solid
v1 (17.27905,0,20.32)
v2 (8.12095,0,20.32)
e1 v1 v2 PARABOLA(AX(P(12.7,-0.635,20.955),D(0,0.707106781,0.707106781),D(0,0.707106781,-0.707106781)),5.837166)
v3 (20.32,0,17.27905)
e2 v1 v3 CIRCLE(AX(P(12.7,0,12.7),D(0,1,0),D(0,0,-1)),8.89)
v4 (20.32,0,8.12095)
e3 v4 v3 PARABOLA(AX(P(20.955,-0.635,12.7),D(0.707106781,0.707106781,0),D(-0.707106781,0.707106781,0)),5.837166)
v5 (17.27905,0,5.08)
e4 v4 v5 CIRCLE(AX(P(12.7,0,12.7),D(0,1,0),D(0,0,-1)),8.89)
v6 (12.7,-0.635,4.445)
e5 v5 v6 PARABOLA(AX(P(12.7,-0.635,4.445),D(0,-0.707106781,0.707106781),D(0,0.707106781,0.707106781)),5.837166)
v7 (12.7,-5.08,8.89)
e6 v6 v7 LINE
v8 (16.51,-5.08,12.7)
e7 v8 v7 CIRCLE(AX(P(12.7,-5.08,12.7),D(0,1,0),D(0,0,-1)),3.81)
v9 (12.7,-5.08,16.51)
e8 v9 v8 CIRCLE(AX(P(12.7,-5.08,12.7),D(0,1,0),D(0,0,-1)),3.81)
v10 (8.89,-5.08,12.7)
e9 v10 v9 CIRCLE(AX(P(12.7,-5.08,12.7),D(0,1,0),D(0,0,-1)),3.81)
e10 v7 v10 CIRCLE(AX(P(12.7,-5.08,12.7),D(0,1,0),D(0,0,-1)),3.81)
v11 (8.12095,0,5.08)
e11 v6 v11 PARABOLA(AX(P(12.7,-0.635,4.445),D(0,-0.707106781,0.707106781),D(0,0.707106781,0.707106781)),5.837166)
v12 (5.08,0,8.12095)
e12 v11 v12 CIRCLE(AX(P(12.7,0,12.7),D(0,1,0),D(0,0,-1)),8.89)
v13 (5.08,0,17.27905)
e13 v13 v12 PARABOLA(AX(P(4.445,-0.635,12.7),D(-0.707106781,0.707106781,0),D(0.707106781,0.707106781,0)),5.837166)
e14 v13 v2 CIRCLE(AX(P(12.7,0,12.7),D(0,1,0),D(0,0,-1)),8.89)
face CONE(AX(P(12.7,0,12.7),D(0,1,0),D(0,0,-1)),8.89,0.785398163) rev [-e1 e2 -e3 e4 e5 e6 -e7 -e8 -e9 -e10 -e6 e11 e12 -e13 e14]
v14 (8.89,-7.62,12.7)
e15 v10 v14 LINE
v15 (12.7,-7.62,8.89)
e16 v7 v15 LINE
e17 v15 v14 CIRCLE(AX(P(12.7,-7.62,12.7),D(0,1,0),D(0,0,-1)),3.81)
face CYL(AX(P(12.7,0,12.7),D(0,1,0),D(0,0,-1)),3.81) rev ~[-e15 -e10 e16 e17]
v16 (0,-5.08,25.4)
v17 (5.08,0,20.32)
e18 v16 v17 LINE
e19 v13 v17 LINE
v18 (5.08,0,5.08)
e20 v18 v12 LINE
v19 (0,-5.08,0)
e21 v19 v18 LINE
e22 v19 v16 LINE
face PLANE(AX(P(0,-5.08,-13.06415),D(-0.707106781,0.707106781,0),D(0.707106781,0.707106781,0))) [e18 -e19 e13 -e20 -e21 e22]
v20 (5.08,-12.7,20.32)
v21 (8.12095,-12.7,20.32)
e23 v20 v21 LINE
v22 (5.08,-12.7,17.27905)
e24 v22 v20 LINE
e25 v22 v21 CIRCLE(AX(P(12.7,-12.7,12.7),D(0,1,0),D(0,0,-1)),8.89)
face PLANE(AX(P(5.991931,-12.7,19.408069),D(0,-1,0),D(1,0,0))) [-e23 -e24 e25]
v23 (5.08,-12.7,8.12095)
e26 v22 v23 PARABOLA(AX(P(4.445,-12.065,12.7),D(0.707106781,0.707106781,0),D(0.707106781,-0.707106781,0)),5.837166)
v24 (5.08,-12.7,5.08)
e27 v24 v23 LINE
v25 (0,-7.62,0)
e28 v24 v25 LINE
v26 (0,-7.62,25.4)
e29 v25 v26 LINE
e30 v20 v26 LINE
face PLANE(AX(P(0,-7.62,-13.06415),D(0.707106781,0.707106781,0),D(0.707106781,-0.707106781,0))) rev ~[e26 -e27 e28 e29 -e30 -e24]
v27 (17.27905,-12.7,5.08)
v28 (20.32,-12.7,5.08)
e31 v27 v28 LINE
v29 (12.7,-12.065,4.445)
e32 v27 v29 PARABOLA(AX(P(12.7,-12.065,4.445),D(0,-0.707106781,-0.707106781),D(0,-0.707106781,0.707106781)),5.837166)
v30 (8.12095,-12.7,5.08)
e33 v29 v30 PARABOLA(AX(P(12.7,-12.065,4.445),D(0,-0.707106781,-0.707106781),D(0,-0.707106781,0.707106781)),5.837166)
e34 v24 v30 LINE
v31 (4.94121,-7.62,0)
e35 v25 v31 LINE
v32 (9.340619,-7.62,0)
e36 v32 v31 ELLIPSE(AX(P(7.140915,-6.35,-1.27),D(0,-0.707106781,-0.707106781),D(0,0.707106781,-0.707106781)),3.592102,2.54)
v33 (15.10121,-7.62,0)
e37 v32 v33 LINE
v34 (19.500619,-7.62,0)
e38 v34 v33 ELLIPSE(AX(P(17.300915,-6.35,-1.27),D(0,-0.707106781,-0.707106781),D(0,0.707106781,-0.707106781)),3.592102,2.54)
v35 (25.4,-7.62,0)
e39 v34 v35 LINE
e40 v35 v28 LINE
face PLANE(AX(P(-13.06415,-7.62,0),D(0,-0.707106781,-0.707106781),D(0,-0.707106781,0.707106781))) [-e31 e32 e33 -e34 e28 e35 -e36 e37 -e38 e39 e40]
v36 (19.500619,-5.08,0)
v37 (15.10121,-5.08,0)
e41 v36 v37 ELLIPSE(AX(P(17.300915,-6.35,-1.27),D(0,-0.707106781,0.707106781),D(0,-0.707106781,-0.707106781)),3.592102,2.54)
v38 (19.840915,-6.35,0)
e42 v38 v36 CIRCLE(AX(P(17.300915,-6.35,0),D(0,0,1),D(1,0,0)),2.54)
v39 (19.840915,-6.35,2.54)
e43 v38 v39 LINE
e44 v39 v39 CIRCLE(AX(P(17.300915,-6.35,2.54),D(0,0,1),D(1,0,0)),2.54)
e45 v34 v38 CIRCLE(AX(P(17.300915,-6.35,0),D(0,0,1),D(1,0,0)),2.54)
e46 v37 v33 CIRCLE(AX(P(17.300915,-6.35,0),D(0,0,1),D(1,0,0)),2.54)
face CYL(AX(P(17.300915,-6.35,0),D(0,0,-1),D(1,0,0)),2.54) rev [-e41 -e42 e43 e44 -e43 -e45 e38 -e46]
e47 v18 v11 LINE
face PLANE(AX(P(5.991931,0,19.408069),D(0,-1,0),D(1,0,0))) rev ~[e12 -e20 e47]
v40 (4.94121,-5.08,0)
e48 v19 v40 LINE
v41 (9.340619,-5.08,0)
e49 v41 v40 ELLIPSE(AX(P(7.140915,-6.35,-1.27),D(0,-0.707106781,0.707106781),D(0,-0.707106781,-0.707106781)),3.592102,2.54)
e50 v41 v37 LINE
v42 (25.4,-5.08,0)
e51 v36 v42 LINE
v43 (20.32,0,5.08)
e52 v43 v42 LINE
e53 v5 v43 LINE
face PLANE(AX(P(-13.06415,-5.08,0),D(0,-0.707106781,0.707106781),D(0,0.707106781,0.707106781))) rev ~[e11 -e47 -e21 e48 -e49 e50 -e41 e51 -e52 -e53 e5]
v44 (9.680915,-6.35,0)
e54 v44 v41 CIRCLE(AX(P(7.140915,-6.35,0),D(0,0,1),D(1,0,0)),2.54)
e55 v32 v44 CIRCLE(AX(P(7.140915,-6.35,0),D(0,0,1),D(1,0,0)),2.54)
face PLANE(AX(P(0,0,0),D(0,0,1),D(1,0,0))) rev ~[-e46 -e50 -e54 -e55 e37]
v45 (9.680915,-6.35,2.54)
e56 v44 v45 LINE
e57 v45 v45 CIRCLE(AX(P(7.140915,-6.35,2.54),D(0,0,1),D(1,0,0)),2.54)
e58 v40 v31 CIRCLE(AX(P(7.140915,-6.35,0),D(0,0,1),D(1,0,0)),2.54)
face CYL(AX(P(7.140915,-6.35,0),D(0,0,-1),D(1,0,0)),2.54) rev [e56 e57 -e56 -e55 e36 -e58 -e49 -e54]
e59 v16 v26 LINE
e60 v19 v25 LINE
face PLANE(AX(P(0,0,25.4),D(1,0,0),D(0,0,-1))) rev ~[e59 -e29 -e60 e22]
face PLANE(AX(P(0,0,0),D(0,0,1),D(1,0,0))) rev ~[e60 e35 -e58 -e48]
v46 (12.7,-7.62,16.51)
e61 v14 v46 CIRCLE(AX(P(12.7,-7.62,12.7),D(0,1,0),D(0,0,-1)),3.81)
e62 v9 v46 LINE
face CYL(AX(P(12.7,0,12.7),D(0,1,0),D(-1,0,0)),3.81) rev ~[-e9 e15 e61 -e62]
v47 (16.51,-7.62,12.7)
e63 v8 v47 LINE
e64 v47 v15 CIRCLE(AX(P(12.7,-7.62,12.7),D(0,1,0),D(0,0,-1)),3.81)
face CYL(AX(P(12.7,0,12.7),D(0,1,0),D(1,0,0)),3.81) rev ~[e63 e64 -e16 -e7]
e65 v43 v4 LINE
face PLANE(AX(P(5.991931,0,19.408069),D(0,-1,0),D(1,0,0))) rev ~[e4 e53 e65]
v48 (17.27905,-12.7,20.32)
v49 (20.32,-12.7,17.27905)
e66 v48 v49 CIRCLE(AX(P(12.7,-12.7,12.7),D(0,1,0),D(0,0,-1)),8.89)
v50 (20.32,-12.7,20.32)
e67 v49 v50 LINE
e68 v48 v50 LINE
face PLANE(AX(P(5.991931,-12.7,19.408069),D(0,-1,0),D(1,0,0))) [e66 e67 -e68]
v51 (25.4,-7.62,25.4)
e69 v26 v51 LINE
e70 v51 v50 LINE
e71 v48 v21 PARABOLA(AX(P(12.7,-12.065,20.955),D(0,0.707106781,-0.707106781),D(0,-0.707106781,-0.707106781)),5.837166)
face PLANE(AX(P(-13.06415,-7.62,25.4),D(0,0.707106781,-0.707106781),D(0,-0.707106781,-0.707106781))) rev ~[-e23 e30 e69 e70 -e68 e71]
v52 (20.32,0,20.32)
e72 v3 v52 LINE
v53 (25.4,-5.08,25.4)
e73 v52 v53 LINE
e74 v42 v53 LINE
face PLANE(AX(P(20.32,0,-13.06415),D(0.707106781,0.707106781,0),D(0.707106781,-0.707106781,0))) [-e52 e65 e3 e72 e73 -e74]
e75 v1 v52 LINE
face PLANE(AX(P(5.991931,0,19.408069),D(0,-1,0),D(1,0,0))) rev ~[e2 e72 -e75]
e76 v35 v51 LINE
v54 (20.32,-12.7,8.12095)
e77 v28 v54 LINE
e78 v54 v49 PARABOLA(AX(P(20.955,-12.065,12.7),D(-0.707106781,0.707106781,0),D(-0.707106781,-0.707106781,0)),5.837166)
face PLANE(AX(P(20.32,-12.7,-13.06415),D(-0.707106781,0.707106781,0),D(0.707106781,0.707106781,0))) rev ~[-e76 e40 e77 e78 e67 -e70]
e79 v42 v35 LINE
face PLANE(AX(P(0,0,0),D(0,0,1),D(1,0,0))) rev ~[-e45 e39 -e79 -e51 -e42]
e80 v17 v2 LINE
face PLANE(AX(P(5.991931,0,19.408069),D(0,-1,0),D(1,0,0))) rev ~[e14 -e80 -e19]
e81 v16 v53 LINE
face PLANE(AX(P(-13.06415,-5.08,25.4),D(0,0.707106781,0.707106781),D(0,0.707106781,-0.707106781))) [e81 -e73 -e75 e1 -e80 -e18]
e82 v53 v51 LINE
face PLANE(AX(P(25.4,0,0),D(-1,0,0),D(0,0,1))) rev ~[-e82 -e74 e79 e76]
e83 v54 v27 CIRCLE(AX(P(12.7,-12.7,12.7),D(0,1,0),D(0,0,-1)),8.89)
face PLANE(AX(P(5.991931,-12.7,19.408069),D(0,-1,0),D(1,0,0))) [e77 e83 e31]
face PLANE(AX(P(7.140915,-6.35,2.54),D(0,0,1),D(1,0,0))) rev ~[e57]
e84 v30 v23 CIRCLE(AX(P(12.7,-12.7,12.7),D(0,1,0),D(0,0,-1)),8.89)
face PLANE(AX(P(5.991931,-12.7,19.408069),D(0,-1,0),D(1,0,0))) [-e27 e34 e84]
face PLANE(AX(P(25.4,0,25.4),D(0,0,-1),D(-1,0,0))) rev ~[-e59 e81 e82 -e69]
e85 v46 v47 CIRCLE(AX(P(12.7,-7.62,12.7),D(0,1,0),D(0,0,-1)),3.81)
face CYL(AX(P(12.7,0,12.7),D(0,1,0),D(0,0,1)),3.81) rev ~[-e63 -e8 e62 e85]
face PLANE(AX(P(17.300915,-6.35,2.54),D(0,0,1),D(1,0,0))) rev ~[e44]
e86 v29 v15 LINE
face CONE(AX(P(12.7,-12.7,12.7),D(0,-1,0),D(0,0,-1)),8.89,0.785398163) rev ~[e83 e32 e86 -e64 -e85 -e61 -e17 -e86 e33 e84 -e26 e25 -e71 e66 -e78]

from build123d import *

# Parameters (mm, degrees)
F1_DEPTH    = 12.7
F2_R        = 2.54
F3_DEPTH    = 2.54
F4_T1_DEPTH = 51.5282991577
F4_T3_DEPTH = 51.5282991577


# Not quite as in the source:
# - a fillet or chamfer that OpenCascade refuses, or shapes differently, is made with other operations: its cross-section is extruded or revolved along the edge and cut away or added


with BuildPart() as f1:
    # F0 (on Front) → F1 (new body)
    with BuildSketch(Plane.XZ):
        with BuildLine():
            Line((0, 25.4), (0, 12.7))
            Line((0, 12.7), (8.89, 12.7))
            ThreePointArc((8.89, 12.7), (10.0059231637, 15.3940768363), (12.7, 16.51))
            Line((12.7, 16.51), (12.7, 25.4))
            Line((12.7, 25.4), (0, 25.4))
        make_face()
        with BuildLine():
            Line((16.51, 12.7), (25.4, 12.7))
            Line((25.4, 12.7), (25.4, 25.4))
            Line((25.4, 25.4), (12.7, 25.4))
            Line((12.7, 25.4), (12.7, 16.51))
            ThreePointArc((12.7, 16.51), (15.3940768363, 15.3940768363), (16.51, 12.7))
        make_face()
        with BuildLine():
            Line((12.7, 8.89), (12.7, 0))
            Line((12.7, 0), (25.4, 0))
            Line((25.4, 0), (25.4, 12.7))
            Line((25.4, 12.7), (16.51, 12.7))
            ThreePointArc((16.51, 12.7), (15.3940768363, 10.0059231637), (12.7, 8.89))
        make_face()
        with BuildLine():
            Line((0, 12.7), (0, 0))
            Line((0, 0), (12.7, 0))
            Line((12.7, 0), (12.7, 8.89))
            ThreePointArc((12.7, 8.89), (10.0059231637, 10.0059231637), (8.89, 12.7))
            Line((8.89, 12.7), (0, 12.7))
        make_face()
    extrude(amount=F1_DEPTH)

    # F2 (on Top) → F3 (cut)
    with BuildSketch(Plane.XY):
        with Locations((7.1409146445, -6.35)):
            Circle(F2_R)
        with Locations((17.3009146445, -6.35)):
            Circle(F2_R)
    extrude(amount=F3_DEPTH, mode=Mode.SUBTRACT)

    # F4: chamfer of 5.08 on 10 edges, made by hand

    # F4_s2 → F4_t1 (cut)
    with BuildSketch(Plane.XY.offset(-13.0641495789)):
        Polygon((0, -7.62), (5.08, -12.7), (0, -12.7), align=None)
        Polygon((20.32, -12.7), (25.4, -7.62), (25.4, -12.7), align=None)
        Polygon((0, -5.08), (5.08, 0), (0, 0), align=None)
        Polygon((20.32, 0), (25.4, -5.08), (25.4, 0), align=None)
    extrude(amount=F4_T1_DEPTH, mode=Mode.SUBTRACT)

    # F4_s4 → F4_t3 (cut)
    with BuildSketch(Plane.YZ.offset(-13.0641495789)):
        Polygon((-7.62, 0), (-12.7, 5.08), (-12.7, 0), align=None)
        Polygon((-7.62, 25.4), (-12.7, 20.32), (-12.7, 25.4), align=None)
        Polygon((-5.08, 0), (0, 5.08), (0, 0), align=None)
        Polygon((-5.08, 25.4), (0, 20.32), (0, 25.4), align=None)
    extrude(amount=F4_T3_DEPTH, mode=Mode.SUBTRACT)

    # F4_s5 → F4_t6 (revolve, cut)
    with BuildSketch(Plane.YZ.offset(12.7)):
        Polygon((-12.7, 3.81), (-7.62, 8.89), (-12.7, 8.89), align=None)
    revolve(axis=Axis((12.7, -12.7, 12.7), (0, 1, 0)), mode=Mode.SUBTRACT)

    # F4_s7 → F4_t8 (revolve, cut)
    with BuildSketch(Plane.YZ.offset(12.7)):
        Polygon((0, 3.81), (-5.08, 8.89), (0, 8.89), align=None)
    revolve(axis=Axis((12.7, 0, 12.7), (0, 1, 0)), mode=Mode.SUBTRACT)


solid = f1.part
